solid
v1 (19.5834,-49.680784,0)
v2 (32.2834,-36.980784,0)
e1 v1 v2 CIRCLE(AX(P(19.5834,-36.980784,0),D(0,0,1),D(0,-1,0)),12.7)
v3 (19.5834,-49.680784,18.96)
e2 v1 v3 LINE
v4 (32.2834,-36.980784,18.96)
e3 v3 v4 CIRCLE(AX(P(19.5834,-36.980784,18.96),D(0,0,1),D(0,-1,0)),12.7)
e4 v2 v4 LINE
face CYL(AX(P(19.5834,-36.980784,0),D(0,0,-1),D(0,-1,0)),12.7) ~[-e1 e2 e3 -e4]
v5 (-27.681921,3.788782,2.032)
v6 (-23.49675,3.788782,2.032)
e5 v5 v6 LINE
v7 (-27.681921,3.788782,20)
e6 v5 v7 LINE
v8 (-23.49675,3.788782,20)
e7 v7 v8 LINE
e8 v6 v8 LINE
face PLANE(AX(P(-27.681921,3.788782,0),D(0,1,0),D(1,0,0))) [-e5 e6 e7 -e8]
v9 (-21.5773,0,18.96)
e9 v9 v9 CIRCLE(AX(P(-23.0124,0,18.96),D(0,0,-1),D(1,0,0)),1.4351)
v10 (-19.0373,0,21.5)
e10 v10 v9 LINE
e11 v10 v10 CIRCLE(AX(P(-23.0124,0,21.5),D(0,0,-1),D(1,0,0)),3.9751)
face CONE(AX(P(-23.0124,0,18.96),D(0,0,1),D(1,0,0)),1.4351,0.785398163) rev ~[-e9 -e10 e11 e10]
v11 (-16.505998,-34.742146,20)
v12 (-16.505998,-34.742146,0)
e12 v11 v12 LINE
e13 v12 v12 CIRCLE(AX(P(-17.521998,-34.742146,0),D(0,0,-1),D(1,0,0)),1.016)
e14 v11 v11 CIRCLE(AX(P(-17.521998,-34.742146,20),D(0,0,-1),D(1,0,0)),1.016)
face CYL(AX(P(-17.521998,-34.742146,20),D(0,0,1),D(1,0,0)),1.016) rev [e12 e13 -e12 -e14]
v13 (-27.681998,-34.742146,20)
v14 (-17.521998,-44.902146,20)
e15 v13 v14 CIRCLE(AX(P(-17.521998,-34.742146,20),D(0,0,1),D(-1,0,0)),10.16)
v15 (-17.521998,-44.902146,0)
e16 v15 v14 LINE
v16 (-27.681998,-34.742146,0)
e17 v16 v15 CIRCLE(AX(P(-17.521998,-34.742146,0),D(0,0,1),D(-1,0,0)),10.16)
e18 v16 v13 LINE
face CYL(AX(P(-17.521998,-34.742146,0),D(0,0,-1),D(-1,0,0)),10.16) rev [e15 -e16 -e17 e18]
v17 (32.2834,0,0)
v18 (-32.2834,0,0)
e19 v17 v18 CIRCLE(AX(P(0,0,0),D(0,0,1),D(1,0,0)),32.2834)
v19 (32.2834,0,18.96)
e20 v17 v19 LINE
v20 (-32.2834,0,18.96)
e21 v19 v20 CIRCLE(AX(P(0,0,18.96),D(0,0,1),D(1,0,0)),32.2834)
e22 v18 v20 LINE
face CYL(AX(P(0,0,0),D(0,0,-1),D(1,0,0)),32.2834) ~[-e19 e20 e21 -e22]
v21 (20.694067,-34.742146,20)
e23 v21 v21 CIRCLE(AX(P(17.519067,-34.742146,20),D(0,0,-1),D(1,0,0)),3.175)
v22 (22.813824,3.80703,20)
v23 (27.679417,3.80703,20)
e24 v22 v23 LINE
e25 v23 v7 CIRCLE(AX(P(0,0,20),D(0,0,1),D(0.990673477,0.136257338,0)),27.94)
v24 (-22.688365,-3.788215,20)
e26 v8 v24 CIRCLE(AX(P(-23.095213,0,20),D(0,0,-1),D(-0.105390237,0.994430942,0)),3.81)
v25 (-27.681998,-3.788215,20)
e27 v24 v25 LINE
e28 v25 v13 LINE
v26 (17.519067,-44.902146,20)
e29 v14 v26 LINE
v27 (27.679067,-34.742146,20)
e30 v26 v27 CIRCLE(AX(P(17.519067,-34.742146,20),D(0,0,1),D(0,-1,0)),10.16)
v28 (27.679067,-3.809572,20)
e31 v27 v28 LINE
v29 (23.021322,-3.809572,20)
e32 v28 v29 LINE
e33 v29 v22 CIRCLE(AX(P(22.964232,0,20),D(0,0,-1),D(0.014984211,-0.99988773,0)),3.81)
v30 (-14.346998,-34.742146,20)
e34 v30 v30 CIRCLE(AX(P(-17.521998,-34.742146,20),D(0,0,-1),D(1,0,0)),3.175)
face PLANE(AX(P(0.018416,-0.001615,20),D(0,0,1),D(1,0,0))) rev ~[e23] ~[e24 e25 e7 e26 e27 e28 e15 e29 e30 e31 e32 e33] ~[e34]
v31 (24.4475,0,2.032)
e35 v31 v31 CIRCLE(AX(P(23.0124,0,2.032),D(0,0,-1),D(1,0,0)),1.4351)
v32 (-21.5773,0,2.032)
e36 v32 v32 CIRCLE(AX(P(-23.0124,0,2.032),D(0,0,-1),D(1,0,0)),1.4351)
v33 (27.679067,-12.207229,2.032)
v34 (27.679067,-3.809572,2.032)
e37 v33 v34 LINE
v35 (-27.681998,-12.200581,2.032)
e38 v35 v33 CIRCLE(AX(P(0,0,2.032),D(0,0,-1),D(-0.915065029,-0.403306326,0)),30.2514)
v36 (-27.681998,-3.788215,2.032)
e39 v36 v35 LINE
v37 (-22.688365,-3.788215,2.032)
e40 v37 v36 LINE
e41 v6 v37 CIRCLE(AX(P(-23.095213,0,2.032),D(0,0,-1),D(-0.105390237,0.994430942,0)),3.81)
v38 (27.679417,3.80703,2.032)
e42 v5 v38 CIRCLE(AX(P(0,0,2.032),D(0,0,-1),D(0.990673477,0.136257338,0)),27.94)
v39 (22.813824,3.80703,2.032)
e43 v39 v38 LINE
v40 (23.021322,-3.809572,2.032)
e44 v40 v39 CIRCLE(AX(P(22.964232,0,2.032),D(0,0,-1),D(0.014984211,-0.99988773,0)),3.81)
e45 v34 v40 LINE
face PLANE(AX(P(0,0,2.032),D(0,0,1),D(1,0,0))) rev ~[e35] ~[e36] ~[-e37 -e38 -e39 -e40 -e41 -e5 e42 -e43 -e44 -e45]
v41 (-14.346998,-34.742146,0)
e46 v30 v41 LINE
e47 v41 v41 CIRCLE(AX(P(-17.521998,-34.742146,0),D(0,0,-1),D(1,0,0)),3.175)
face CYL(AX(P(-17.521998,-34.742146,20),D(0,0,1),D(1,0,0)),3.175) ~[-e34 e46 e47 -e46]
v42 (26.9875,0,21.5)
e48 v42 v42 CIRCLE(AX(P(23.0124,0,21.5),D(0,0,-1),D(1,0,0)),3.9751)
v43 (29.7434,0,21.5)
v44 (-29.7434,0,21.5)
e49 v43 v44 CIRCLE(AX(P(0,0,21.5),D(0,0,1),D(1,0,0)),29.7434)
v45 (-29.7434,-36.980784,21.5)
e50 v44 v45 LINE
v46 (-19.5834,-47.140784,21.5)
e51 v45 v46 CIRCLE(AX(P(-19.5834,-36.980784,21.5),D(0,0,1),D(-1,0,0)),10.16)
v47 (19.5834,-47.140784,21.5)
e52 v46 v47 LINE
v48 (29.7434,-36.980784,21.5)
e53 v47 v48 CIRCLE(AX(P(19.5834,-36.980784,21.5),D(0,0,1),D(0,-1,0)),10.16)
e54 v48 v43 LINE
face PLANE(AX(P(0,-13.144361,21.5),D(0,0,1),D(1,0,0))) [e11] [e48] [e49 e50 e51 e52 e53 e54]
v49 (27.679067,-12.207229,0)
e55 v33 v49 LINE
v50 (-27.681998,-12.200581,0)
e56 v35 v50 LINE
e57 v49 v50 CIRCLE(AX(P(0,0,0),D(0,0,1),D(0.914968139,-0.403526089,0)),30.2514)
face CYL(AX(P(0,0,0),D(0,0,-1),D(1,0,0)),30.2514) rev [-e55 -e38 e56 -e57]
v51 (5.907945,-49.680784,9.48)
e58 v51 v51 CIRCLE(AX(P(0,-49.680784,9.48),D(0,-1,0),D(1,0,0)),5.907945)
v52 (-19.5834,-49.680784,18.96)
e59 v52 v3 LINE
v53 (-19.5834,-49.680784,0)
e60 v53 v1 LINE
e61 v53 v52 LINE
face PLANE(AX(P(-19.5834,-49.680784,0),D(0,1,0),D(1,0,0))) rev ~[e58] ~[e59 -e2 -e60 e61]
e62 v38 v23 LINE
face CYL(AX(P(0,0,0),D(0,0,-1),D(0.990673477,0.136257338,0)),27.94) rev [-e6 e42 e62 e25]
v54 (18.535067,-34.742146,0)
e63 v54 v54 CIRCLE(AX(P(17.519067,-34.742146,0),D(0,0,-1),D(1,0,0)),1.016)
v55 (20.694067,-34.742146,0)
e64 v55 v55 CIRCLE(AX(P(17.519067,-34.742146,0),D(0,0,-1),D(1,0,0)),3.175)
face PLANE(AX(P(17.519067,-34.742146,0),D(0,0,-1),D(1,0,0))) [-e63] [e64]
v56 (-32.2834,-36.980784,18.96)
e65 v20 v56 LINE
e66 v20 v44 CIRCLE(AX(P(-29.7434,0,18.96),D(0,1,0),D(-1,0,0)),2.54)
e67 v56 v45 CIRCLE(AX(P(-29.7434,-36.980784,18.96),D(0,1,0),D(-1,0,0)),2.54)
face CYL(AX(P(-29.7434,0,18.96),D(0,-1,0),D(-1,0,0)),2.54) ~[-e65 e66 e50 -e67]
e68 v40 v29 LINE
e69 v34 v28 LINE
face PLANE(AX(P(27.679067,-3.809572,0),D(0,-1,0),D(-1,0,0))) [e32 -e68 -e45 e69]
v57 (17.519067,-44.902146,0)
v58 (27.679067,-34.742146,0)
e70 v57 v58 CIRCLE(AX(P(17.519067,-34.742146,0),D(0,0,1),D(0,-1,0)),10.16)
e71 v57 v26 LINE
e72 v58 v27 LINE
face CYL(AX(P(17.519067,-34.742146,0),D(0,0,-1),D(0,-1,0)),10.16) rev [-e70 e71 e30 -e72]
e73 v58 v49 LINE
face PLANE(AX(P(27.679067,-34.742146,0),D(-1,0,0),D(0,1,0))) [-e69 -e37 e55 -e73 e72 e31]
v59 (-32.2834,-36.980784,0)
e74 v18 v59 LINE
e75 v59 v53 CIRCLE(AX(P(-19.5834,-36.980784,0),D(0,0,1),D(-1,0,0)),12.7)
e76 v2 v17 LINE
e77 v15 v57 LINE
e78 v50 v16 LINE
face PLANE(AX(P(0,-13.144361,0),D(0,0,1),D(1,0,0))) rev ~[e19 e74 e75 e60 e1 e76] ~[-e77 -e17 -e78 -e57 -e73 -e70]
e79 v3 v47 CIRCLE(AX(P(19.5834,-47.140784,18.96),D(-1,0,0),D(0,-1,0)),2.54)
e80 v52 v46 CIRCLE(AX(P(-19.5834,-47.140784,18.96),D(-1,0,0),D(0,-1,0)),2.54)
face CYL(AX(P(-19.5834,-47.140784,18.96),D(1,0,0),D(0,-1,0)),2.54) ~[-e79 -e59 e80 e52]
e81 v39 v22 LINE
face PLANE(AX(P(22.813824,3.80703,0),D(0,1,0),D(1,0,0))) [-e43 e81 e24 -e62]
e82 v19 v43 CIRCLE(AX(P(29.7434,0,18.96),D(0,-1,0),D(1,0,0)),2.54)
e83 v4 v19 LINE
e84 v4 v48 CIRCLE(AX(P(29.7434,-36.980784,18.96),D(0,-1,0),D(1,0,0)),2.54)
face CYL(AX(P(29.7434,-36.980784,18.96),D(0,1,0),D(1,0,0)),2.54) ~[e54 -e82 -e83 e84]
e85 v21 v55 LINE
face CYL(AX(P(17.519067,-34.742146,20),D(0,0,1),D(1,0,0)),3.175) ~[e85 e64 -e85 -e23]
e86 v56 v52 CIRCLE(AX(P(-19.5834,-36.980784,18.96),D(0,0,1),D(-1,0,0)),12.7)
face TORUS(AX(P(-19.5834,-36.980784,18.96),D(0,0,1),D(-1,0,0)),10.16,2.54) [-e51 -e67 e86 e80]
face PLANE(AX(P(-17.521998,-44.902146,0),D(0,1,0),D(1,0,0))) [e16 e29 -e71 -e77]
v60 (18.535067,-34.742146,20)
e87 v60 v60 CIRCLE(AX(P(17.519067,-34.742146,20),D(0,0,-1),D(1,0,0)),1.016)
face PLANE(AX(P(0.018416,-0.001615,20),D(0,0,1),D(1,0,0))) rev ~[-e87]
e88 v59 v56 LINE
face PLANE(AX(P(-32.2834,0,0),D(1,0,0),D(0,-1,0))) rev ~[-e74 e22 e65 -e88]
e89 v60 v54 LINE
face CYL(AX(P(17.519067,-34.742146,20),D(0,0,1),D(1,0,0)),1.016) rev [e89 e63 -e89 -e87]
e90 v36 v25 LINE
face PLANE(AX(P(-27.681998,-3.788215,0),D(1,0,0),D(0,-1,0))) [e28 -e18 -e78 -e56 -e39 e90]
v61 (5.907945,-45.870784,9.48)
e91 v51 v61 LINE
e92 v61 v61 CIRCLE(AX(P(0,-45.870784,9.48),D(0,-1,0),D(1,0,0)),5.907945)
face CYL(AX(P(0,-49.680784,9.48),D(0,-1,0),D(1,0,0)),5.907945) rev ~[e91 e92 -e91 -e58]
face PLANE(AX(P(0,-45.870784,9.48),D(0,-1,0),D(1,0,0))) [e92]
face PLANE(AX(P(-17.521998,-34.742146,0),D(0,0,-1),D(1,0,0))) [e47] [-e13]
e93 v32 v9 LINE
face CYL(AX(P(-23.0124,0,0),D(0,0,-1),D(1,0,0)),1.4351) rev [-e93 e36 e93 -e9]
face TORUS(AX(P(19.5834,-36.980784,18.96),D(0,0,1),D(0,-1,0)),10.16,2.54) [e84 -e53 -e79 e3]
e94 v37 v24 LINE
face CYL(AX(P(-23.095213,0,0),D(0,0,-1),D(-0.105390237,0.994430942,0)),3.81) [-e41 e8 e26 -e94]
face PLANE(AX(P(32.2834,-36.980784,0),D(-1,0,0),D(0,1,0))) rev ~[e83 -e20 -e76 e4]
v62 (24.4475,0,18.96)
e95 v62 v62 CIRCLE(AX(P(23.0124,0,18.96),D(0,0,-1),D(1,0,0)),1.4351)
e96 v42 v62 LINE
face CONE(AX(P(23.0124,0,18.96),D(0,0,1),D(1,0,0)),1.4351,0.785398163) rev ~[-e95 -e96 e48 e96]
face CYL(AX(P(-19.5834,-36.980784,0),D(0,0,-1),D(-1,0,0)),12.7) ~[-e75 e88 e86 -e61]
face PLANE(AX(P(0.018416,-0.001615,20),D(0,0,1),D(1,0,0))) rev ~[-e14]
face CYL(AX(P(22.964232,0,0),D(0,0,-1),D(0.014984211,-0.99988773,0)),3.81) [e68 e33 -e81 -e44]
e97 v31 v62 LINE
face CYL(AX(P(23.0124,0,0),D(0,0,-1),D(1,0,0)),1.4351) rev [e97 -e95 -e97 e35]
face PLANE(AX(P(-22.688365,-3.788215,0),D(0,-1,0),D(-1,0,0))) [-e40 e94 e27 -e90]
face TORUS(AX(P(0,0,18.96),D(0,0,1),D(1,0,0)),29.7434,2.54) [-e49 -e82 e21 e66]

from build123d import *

# Parameters (mm, degrees)
F1_R      = 7.62
F2_DEPTH  = 8.9916
F3_R      = 3.175
F4_DEPTH  = 18.5
F7_DEPTH  = 21.5
F5_R      = 1.4351
F8_DEPTH  = 25.4
F11_DEPTH = 20
F12_R     = 2.54
F13_SIZE  = 2.54
F6_R      = 30.2514
F14_DEPTH = 2.032
F16_R     = 30.2514
F17_DEPTH = 2.032
F18_R     = 5.9079449729
F19_DEPTH = 3.81
F20_R     = 3.175
F20_R_2   = 1.016
F21_DEPTH = 20


# Not quite as in the source:
# - a feature of the source that left no trace in its solid (it failed there, or was rolled back) is left out
# - a feature names something its author has since deleted; it is built from what else it names


with BuildPart() as f2:
    # F1 (on Top) → F2 (new body)
    with BuildSketch(Plane.XY):
        with BuildLine():
            Line((14.3891, -27.8892), (14.3891, 5.7461149649))
            ThreePointArc((14.3891, 5.7461149649), (0, 15.494), (-14.3891, 5.7461149649))
            Line((-14.3891, 5.7461149649), (-14.3891, -27.8892))
            Line((-14.3891, -27.8892), (14.3891, -27.8892))
        make_face()
        Circle(F1_R, mode=Mode.SUBTRACT)
    extrude(amount=F2_DEPTH)


with BuildPart() as f4:
    # F3 (on Top) → F4 (new body)
    with BuildSketch(Plane.XY):
        Circle(F3_R)
    extrude(amount=F4_DEPTH)


with BuildPart() as f7:
    # F0 (on Top) → F7 (new body)
    with BuildSketch(Plane.XY):
        with BuildLine():
            Line((32.2834, -36.9807843447), (32.2834, 0))
            ThreePointArc((32.2834, 0), (0, 32.2834), (-32.2834, 0))
            Line((-32.2834, 0), (-32.2834, -36.9807843447))
            ThreePointArc((-32.2834, -36.9807843447), (-28.5636561211, -45.9610404657), (-19.5834, -49.6807843447))
            Line((-19.5834, -49.6807843447), (19.5834, -49.6807843447))
            ThreePointArc((19.5834, -49.6807843447), (28.5636561211, -45.9610404657), (32.2834, -36.9807843447))
        make_face()
    extrude(amount=F7_DEPTH)

    # F5 (on Top) → F8 (cut)
    with BuildSketch(Plane.XY):
        with Locations((-23.0124, 0)):
            Circle(F5_R)
        with Locations((23.0124, 0)):
            Circle(F5_R)
    extrude(amount=F8_DEPTH, mode=Mode.SUBTRACT)


with BuildPart() as f11_tool:
    # F10 (on Top) → F11 (new body)
    with BuildSketch(Plane.XY):
        with BuildLine():
            Line((-23.5020610966, -3.7882152164), (-27.6819982204, -3.7882152164))
            ThreePointArc((-27.6819982204, -3.7882152164), (-0.010778614, -27.9399979209), (27.6790671673, -3.8095722529))
            Line((27.6790671673, -3.8095722529), (23.0213215121, -3.8095722529))
            ThreePointArc((23.0213215121, -3.8095722529), (19.1556447136, -0.1037564295), (22.8138242261, 3.8070300236))
            ThreePointArc((22.8138242261, 3.8070300236), (22.9642316699, 3.81), (23.1146391137, 3.8070300236))
            Line((23.1146391137, 3.8070300236), (27.6794169447, 3.8070300236))
            ThreePointArc((27.6794169447, 3.8070300236), (-0.0092095477, 27.9399984822), (-27.6819206668, 3.7887818881))
            Line((-27.6819206668, 3.7887818881), (-23.4967496803, 3.7887818881))
            ThreePointArc((-23.4967496803, 3.7887818881), (-19.3067133937, 0.4041926109), (-22.688364657, -3.7882152164))
            ThreePointArc((-22.688364657, -3.7882152164), (-23.0952128768, -3.81), (-23.5020610966, -3.7882152164))
        make_face()
        with BuildLine():
            ThreePointArc((27.6790671673, -3.8095722529), (-0.010778614, -27.9399979209), (-27.6819982204, -3.7882152164))
            Line((-27.6819982204, -3.7882152164), (-27.6819982204, -34.7421456456))
            ThreePointArc((-27.6819982204, -34.7421456456), (-24.7062031172, -41.9263505425), (-17.5219982204, -44.9021456456))
            Line((-17.5219982204, -44.9021456456), (17.5190671673, -44.9021456456))
            ThreePointArc((17.5190671673, -44.9021456456), (24.7032720641, -41.9263505425), (27.6790671673, -34.7421456456))
            Line((27.6790671673, -34.7421456456), (27.6790671673, -3.8095722529))
        make_face()
        with BuildLine():
            Line((-22.688364657, -3.7882152164), (-23.5020610966, -3.7882152164))
            ThreePointArc((-23.5020610966, -3.7882152164), (-23.0952128768, -3.81), (-22.688364657, -3.7882152164))
        make_face()
        with BuildLine():
            ThreePointArc((23.1146391137, 3.8070300236), (22.9642316699, 3.81), (22.8138242261, 3.8070300236))
            Line((22.8138242261, 3.8070300236), (23.1146391137, 3.8070300236))
        make_face()
    extrude(amount=F11_DEPTH)


with BuildPart() as f2_1:
    add(f2.part)

    # F11: cut by f11_tool
    add(f11_tool.part, mode=Mode.SUBTRACT)


with BuildPart() as f4_1:
    add(f4.part)

    # F11: cut by f11_tool
    add(f11_tool.part, mode=Mode.SUBTRACT)


with BuildPart() as f7_1:
    add(f7.part)

    # F11: cut by f11_tool
    add(f11_tool.part, mode=Mode.SUBTRACT)

    # F12
    f12_edges = [f7_1.edges().sort_by_distance(p)[0] for p in [
        (0, 32.2834, 21.5),
        (32.2834, -18.490392, 21.5),
        (28.563656, -45.96104, 21.5),
        (0, -49.680784, 21.5),
        (-32.2834, -18.490392, 21.5),
        (-28.563656, -45.96104, 21.5),
    ]]
    fillet(f12_edges, radius=F12_R)

    # F13
    f13_edges = [f7_1.edges().sort_by_distance(p)[0] for p in [
        (-24.4475, 0, 21.5),
        (21.5773, 0, 21.5),
    ]]
    chamfer(f13_edges, length=F13_SIZE)

    # F6 (on Top) → F14 (cut)
    with BuildSketch(Plane.XY):
        Circle(F6_R)
    extrude(amount=F14_DEPTH, mode=Mode.SUBTRACT)

    # F16 (on Top) + F6 (on Top) → F17 (cut)
    with BuildSketch(Plane.XY):
        Circle(F16_R)
    with BuildSketch(Plane.XY):
        Circle(F6_R)
    extrude(amount=F17_DEPTH, mode=Mode.SUBTRACT)

    # F18 (on face) → F19 (cut)
    with BuildSketch(Plane.XZ.offset(49.6807843447)):
        with Locations((0, 9.48)):
            Circle(F18_R)
    extrude(amount=-F19_DEPTH, mode=Mode.SUBTRACT)

    # F20 (on face) → F21 (join, through all)
    with BuildSketch(Plane(origin=(0, 0, 20), x_dir=(1, 0, 0), z_dir=(0, 0, -1))):
        with Locations((17.5190671673, 34.7421456456)):
            Circle(F20_R)
        with Locations((17.5190671673, 34.7421456456)):
            Circle(F20_R_2, mode=Mode.SUBTRACT)
        with Locations((-17.5219982204, 34.7421456456)):
            Circle(F20_R)
        with Locations((-17.5219982204, 34.7421456456)):
            Circle(F20_R_2, mode=Mode.SUBTRACT)
    extrude(amount=F21_DEPTH)


solid = f7_1.part
